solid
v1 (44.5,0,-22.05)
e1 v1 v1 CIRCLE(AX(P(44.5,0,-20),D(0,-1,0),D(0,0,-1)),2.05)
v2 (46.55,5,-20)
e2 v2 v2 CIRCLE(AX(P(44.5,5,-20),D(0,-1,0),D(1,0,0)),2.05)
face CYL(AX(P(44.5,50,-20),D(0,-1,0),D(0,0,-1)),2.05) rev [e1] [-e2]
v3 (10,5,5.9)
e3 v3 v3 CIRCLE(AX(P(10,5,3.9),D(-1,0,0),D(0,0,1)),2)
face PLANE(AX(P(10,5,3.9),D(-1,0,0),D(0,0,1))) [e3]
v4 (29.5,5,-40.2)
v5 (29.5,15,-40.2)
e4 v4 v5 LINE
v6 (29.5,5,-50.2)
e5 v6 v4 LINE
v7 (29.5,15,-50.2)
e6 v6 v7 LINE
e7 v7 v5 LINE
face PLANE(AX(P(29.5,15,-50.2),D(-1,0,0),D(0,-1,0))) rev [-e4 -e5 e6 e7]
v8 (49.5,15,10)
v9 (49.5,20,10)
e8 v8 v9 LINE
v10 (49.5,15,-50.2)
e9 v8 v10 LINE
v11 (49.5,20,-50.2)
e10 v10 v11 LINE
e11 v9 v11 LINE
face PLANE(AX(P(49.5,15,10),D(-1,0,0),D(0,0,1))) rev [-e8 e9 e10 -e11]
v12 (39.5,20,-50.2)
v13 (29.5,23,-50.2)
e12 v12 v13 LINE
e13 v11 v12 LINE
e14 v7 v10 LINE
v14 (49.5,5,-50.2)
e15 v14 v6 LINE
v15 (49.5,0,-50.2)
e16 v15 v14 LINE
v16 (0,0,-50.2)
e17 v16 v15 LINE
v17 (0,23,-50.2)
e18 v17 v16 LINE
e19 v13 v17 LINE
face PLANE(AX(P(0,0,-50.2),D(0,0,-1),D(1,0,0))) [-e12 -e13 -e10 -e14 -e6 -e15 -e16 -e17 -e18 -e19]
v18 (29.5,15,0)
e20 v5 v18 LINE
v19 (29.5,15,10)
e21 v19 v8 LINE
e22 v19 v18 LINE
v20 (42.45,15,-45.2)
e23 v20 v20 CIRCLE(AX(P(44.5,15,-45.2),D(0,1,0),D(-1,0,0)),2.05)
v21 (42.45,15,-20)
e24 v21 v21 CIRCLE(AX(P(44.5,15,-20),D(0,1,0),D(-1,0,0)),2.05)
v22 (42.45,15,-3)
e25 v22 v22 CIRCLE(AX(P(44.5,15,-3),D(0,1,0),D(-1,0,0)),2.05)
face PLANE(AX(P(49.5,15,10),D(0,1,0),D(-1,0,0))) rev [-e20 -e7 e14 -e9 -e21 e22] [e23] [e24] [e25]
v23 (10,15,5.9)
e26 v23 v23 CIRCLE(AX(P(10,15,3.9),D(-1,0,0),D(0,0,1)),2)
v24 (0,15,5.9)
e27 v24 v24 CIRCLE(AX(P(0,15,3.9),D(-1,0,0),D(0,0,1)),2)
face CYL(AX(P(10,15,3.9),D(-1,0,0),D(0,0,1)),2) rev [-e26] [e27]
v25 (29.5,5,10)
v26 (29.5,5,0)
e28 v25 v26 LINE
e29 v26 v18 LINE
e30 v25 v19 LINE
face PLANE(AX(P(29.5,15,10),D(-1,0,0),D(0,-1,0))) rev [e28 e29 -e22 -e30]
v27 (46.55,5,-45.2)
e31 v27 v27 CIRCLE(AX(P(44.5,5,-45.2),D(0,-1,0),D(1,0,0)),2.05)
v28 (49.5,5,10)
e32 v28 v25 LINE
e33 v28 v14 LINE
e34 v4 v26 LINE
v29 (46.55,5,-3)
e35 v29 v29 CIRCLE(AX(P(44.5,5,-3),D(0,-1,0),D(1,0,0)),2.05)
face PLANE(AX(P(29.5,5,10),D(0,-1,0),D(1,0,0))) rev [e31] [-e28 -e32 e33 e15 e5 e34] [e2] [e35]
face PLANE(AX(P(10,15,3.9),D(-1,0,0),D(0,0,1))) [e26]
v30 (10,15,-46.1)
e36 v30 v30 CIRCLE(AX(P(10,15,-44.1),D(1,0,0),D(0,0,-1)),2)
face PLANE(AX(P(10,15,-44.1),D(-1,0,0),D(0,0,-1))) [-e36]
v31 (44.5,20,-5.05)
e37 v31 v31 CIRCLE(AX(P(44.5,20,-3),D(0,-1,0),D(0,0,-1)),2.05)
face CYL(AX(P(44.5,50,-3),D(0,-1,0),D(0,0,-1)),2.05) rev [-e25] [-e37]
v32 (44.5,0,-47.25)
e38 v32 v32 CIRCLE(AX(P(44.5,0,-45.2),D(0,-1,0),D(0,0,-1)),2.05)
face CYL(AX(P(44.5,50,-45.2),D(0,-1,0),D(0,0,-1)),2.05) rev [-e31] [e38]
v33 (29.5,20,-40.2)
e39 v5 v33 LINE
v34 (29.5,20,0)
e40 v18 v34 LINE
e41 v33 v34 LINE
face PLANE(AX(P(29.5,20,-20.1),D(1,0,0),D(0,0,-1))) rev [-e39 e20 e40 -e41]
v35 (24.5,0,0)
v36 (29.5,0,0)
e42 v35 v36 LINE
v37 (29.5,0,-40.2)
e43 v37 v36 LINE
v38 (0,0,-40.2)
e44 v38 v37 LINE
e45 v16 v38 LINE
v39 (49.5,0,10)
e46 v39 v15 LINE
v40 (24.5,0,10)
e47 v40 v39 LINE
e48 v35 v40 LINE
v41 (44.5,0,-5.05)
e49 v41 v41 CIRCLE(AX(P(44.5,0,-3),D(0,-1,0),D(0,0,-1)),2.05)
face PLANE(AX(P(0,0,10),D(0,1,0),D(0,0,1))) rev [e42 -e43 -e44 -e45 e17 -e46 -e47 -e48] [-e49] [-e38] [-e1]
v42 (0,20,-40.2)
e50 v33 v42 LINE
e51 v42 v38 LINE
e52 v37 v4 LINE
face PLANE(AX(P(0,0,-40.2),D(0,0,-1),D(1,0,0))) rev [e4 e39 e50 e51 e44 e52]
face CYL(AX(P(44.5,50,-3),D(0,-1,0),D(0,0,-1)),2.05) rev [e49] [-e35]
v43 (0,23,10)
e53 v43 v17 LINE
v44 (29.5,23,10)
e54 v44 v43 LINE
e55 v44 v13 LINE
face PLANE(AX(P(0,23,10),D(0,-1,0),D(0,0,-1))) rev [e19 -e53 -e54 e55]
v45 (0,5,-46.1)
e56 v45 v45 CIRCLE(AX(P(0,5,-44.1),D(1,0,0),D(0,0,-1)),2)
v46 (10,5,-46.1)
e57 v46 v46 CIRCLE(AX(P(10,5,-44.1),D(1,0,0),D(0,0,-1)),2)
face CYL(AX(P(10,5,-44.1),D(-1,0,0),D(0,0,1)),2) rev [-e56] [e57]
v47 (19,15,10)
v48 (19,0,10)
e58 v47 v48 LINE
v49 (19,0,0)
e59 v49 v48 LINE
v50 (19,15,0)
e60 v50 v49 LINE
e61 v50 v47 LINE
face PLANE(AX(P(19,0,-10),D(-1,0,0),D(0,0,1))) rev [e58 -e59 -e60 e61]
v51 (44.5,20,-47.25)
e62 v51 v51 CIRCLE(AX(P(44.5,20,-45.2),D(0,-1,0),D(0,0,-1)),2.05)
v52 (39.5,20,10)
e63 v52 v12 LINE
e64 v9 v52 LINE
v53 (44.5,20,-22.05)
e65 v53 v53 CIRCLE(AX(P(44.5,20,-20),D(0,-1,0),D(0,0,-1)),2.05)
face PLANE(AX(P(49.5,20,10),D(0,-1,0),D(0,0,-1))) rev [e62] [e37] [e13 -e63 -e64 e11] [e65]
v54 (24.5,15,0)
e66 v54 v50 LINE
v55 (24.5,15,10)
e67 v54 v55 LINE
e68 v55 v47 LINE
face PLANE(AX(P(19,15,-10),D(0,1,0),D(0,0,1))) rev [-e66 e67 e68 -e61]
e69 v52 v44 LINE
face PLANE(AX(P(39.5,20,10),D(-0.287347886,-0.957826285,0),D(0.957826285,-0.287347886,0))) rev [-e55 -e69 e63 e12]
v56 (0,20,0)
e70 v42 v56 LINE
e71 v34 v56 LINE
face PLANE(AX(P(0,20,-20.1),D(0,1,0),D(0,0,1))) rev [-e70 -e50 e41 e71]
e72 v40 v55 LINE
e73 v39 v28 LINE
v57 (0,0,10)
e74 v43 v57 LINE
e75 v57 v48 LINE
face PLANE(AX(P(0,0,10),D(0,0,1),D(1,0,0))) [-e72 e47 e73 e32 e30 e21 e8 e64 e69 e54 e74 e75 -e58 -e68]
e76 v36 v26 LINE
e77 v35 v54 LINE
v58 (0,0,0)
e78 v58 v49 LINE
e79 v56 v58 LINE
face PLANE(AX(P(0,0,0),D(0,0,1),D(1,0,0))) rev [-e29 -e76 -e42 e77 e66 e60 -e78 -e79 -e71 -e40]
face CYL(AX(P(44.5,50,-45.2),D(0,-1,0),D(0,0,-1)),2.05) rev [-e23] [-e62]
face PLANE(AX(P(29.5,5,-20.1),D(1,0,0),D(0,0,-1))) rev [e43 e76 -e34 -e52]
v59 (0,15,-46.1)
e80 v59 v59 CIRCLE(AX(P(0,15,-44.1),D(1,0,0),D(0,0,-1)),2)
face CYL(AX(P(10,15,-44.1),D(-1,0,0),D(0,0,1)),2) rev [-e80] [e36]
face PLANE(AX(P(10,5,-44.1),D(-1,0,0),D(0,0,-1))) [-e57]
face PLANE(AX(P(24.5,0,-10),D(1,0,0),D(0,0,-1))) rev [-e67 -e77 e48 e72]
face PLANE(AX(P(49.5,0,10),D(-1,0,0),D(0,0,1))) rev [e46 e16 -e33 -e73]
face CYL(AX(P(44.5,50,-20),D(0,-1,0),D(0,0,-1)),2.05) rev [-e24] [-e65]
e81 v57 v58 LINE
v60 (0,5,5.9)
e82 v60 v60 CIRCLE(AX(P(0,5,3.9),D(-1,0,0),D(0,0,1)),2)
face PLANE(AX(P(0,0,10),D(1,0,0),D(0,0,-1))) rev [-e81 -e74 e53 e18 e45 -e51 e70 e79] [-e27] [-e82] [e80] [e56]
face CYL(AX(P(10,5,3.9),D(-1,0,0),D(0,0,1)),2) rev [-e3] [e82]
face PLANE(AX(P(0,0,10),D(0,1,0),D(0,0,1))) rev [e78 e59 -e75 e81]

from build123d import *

# Parameters (mm, degrees)
BOSS_EXTRUDE1_DEPTH = 10
SKETCH6_W           = 20
SKETCH6_H           = 5
BOSS_EXTRUDE2_DEPTH = 20.1
SKETCH8_W           = 5.5
SKETCH8_H           = 15
CUT_EXTRUDE1_DEPTH  = 20
SKETCH9_R           = 2.05
CUT_EXTRUDE2_DEPTH  = 50
SKETCH2_R           = 2
CUT_EXTRUDE3_DEPTH  = 10
MIRROR3_OUTLINE_R   = 2
MIRROR3_DEPTH       = 10


# Read off the part's stored shape, not the designer's step: Mirror3
with BuildPart() as part:
    # Sketch1 → Boss-Extrude1 (new body)
    with BuildSketch(Plane.XY):
        Polygon((0, 0), (0, 23), (29.5, 23), (39.5, 20), (49.5, 20), (49.5, 15), (29.5, 15), (29.5, 5), (49.5, 5), (49.5, 0), align=None)
    extrude(amount=BOSS_EXTRUDE1_DEPTH)

    # Sketch6 → Boss-Extrude2 (add)
    with BuildSketch(Plane(origin=(0, 0, 0), x_dir=(-1, 0, 0), z_dir=(0, 0, -1))):
        Polygon((-29.5, 15), (-49.5, 15), (-49.5, 20), (-39.5, 20), (-29.5, 23), (0, 23), (0, 20), (-29.5, 20), align=None)
        with Locations((-39.5, 2.5)):
            Rectangle(SKETCH6_W, SKETCH6_H)
    extrude(amount=BOSS_EXTRUDE2_DEPTH)

    # Mirror2: part across face


with BuildPart() as part_1:
    add(part.part)
    add(part.part.mirror(Plane(origin=(28.245085995, 19.497542998, -20.1), x_dir=(1, 0, 0), z_dir=(0, 0, -1))))

    # Sketch8 → Cut-Extrude1 (cut)
    with BuildSketch(Plane.XY.offset(10)):
        with Locations((21.75, 7.5)):
            Rectangle(SKETCH8_W, SKETCH8_H)
    extrude(amount=-CUT_EXTRUDE1_DEPTH, mode=Mode.SUBTRACT)

    # Sketch9 → Cut-Extrude2 (cut)
    with BuildSketch(Plane.XZ):
        with Locations(Location((44.5, -3, 0), (0, 0, 270))):
            Circle(SKETCH9_R)
        with Locations(Location((44.5, -45.2, 0), (0, 0, 270))):
            Circle(SKETCH9_R)
        with Locations(Location((44.5, -20, 0), (0, 0, 270))):
            Circle(SKETCH9_R)
    extrude(amount=-CUT_EXTRUDE2_DEPTH, mode=Mode.SUBTRACT)

    # Sketch2 → Cut-Extrude3 (cut)
    with BuildSketch(Plane.ZY):
        with Locations((3.9, 5)):
            Circle(SKETCH2_R)
        with Locations((3.9, 15)):
            Circle(SKETCH2_R)
    extrude(amount=-CUT_EXTRUDE3_DEPTH, mode=Mode.SUBTRACT)

    # Mirror3 outline → Mirror3 (cut)
    with BuildSketch(Plane.YZ):
        with Locations((15, -44.1)):
            Circle(MIRROR3_OUTLINE_R)
        with Locations((5, -44.1)):
            Circle(MIRROR3_OUTLINE_R)
    extrude(amount=MIRROR3_DEPTH, mode=Mode.SUBTRACT)


solid = part_1.part
